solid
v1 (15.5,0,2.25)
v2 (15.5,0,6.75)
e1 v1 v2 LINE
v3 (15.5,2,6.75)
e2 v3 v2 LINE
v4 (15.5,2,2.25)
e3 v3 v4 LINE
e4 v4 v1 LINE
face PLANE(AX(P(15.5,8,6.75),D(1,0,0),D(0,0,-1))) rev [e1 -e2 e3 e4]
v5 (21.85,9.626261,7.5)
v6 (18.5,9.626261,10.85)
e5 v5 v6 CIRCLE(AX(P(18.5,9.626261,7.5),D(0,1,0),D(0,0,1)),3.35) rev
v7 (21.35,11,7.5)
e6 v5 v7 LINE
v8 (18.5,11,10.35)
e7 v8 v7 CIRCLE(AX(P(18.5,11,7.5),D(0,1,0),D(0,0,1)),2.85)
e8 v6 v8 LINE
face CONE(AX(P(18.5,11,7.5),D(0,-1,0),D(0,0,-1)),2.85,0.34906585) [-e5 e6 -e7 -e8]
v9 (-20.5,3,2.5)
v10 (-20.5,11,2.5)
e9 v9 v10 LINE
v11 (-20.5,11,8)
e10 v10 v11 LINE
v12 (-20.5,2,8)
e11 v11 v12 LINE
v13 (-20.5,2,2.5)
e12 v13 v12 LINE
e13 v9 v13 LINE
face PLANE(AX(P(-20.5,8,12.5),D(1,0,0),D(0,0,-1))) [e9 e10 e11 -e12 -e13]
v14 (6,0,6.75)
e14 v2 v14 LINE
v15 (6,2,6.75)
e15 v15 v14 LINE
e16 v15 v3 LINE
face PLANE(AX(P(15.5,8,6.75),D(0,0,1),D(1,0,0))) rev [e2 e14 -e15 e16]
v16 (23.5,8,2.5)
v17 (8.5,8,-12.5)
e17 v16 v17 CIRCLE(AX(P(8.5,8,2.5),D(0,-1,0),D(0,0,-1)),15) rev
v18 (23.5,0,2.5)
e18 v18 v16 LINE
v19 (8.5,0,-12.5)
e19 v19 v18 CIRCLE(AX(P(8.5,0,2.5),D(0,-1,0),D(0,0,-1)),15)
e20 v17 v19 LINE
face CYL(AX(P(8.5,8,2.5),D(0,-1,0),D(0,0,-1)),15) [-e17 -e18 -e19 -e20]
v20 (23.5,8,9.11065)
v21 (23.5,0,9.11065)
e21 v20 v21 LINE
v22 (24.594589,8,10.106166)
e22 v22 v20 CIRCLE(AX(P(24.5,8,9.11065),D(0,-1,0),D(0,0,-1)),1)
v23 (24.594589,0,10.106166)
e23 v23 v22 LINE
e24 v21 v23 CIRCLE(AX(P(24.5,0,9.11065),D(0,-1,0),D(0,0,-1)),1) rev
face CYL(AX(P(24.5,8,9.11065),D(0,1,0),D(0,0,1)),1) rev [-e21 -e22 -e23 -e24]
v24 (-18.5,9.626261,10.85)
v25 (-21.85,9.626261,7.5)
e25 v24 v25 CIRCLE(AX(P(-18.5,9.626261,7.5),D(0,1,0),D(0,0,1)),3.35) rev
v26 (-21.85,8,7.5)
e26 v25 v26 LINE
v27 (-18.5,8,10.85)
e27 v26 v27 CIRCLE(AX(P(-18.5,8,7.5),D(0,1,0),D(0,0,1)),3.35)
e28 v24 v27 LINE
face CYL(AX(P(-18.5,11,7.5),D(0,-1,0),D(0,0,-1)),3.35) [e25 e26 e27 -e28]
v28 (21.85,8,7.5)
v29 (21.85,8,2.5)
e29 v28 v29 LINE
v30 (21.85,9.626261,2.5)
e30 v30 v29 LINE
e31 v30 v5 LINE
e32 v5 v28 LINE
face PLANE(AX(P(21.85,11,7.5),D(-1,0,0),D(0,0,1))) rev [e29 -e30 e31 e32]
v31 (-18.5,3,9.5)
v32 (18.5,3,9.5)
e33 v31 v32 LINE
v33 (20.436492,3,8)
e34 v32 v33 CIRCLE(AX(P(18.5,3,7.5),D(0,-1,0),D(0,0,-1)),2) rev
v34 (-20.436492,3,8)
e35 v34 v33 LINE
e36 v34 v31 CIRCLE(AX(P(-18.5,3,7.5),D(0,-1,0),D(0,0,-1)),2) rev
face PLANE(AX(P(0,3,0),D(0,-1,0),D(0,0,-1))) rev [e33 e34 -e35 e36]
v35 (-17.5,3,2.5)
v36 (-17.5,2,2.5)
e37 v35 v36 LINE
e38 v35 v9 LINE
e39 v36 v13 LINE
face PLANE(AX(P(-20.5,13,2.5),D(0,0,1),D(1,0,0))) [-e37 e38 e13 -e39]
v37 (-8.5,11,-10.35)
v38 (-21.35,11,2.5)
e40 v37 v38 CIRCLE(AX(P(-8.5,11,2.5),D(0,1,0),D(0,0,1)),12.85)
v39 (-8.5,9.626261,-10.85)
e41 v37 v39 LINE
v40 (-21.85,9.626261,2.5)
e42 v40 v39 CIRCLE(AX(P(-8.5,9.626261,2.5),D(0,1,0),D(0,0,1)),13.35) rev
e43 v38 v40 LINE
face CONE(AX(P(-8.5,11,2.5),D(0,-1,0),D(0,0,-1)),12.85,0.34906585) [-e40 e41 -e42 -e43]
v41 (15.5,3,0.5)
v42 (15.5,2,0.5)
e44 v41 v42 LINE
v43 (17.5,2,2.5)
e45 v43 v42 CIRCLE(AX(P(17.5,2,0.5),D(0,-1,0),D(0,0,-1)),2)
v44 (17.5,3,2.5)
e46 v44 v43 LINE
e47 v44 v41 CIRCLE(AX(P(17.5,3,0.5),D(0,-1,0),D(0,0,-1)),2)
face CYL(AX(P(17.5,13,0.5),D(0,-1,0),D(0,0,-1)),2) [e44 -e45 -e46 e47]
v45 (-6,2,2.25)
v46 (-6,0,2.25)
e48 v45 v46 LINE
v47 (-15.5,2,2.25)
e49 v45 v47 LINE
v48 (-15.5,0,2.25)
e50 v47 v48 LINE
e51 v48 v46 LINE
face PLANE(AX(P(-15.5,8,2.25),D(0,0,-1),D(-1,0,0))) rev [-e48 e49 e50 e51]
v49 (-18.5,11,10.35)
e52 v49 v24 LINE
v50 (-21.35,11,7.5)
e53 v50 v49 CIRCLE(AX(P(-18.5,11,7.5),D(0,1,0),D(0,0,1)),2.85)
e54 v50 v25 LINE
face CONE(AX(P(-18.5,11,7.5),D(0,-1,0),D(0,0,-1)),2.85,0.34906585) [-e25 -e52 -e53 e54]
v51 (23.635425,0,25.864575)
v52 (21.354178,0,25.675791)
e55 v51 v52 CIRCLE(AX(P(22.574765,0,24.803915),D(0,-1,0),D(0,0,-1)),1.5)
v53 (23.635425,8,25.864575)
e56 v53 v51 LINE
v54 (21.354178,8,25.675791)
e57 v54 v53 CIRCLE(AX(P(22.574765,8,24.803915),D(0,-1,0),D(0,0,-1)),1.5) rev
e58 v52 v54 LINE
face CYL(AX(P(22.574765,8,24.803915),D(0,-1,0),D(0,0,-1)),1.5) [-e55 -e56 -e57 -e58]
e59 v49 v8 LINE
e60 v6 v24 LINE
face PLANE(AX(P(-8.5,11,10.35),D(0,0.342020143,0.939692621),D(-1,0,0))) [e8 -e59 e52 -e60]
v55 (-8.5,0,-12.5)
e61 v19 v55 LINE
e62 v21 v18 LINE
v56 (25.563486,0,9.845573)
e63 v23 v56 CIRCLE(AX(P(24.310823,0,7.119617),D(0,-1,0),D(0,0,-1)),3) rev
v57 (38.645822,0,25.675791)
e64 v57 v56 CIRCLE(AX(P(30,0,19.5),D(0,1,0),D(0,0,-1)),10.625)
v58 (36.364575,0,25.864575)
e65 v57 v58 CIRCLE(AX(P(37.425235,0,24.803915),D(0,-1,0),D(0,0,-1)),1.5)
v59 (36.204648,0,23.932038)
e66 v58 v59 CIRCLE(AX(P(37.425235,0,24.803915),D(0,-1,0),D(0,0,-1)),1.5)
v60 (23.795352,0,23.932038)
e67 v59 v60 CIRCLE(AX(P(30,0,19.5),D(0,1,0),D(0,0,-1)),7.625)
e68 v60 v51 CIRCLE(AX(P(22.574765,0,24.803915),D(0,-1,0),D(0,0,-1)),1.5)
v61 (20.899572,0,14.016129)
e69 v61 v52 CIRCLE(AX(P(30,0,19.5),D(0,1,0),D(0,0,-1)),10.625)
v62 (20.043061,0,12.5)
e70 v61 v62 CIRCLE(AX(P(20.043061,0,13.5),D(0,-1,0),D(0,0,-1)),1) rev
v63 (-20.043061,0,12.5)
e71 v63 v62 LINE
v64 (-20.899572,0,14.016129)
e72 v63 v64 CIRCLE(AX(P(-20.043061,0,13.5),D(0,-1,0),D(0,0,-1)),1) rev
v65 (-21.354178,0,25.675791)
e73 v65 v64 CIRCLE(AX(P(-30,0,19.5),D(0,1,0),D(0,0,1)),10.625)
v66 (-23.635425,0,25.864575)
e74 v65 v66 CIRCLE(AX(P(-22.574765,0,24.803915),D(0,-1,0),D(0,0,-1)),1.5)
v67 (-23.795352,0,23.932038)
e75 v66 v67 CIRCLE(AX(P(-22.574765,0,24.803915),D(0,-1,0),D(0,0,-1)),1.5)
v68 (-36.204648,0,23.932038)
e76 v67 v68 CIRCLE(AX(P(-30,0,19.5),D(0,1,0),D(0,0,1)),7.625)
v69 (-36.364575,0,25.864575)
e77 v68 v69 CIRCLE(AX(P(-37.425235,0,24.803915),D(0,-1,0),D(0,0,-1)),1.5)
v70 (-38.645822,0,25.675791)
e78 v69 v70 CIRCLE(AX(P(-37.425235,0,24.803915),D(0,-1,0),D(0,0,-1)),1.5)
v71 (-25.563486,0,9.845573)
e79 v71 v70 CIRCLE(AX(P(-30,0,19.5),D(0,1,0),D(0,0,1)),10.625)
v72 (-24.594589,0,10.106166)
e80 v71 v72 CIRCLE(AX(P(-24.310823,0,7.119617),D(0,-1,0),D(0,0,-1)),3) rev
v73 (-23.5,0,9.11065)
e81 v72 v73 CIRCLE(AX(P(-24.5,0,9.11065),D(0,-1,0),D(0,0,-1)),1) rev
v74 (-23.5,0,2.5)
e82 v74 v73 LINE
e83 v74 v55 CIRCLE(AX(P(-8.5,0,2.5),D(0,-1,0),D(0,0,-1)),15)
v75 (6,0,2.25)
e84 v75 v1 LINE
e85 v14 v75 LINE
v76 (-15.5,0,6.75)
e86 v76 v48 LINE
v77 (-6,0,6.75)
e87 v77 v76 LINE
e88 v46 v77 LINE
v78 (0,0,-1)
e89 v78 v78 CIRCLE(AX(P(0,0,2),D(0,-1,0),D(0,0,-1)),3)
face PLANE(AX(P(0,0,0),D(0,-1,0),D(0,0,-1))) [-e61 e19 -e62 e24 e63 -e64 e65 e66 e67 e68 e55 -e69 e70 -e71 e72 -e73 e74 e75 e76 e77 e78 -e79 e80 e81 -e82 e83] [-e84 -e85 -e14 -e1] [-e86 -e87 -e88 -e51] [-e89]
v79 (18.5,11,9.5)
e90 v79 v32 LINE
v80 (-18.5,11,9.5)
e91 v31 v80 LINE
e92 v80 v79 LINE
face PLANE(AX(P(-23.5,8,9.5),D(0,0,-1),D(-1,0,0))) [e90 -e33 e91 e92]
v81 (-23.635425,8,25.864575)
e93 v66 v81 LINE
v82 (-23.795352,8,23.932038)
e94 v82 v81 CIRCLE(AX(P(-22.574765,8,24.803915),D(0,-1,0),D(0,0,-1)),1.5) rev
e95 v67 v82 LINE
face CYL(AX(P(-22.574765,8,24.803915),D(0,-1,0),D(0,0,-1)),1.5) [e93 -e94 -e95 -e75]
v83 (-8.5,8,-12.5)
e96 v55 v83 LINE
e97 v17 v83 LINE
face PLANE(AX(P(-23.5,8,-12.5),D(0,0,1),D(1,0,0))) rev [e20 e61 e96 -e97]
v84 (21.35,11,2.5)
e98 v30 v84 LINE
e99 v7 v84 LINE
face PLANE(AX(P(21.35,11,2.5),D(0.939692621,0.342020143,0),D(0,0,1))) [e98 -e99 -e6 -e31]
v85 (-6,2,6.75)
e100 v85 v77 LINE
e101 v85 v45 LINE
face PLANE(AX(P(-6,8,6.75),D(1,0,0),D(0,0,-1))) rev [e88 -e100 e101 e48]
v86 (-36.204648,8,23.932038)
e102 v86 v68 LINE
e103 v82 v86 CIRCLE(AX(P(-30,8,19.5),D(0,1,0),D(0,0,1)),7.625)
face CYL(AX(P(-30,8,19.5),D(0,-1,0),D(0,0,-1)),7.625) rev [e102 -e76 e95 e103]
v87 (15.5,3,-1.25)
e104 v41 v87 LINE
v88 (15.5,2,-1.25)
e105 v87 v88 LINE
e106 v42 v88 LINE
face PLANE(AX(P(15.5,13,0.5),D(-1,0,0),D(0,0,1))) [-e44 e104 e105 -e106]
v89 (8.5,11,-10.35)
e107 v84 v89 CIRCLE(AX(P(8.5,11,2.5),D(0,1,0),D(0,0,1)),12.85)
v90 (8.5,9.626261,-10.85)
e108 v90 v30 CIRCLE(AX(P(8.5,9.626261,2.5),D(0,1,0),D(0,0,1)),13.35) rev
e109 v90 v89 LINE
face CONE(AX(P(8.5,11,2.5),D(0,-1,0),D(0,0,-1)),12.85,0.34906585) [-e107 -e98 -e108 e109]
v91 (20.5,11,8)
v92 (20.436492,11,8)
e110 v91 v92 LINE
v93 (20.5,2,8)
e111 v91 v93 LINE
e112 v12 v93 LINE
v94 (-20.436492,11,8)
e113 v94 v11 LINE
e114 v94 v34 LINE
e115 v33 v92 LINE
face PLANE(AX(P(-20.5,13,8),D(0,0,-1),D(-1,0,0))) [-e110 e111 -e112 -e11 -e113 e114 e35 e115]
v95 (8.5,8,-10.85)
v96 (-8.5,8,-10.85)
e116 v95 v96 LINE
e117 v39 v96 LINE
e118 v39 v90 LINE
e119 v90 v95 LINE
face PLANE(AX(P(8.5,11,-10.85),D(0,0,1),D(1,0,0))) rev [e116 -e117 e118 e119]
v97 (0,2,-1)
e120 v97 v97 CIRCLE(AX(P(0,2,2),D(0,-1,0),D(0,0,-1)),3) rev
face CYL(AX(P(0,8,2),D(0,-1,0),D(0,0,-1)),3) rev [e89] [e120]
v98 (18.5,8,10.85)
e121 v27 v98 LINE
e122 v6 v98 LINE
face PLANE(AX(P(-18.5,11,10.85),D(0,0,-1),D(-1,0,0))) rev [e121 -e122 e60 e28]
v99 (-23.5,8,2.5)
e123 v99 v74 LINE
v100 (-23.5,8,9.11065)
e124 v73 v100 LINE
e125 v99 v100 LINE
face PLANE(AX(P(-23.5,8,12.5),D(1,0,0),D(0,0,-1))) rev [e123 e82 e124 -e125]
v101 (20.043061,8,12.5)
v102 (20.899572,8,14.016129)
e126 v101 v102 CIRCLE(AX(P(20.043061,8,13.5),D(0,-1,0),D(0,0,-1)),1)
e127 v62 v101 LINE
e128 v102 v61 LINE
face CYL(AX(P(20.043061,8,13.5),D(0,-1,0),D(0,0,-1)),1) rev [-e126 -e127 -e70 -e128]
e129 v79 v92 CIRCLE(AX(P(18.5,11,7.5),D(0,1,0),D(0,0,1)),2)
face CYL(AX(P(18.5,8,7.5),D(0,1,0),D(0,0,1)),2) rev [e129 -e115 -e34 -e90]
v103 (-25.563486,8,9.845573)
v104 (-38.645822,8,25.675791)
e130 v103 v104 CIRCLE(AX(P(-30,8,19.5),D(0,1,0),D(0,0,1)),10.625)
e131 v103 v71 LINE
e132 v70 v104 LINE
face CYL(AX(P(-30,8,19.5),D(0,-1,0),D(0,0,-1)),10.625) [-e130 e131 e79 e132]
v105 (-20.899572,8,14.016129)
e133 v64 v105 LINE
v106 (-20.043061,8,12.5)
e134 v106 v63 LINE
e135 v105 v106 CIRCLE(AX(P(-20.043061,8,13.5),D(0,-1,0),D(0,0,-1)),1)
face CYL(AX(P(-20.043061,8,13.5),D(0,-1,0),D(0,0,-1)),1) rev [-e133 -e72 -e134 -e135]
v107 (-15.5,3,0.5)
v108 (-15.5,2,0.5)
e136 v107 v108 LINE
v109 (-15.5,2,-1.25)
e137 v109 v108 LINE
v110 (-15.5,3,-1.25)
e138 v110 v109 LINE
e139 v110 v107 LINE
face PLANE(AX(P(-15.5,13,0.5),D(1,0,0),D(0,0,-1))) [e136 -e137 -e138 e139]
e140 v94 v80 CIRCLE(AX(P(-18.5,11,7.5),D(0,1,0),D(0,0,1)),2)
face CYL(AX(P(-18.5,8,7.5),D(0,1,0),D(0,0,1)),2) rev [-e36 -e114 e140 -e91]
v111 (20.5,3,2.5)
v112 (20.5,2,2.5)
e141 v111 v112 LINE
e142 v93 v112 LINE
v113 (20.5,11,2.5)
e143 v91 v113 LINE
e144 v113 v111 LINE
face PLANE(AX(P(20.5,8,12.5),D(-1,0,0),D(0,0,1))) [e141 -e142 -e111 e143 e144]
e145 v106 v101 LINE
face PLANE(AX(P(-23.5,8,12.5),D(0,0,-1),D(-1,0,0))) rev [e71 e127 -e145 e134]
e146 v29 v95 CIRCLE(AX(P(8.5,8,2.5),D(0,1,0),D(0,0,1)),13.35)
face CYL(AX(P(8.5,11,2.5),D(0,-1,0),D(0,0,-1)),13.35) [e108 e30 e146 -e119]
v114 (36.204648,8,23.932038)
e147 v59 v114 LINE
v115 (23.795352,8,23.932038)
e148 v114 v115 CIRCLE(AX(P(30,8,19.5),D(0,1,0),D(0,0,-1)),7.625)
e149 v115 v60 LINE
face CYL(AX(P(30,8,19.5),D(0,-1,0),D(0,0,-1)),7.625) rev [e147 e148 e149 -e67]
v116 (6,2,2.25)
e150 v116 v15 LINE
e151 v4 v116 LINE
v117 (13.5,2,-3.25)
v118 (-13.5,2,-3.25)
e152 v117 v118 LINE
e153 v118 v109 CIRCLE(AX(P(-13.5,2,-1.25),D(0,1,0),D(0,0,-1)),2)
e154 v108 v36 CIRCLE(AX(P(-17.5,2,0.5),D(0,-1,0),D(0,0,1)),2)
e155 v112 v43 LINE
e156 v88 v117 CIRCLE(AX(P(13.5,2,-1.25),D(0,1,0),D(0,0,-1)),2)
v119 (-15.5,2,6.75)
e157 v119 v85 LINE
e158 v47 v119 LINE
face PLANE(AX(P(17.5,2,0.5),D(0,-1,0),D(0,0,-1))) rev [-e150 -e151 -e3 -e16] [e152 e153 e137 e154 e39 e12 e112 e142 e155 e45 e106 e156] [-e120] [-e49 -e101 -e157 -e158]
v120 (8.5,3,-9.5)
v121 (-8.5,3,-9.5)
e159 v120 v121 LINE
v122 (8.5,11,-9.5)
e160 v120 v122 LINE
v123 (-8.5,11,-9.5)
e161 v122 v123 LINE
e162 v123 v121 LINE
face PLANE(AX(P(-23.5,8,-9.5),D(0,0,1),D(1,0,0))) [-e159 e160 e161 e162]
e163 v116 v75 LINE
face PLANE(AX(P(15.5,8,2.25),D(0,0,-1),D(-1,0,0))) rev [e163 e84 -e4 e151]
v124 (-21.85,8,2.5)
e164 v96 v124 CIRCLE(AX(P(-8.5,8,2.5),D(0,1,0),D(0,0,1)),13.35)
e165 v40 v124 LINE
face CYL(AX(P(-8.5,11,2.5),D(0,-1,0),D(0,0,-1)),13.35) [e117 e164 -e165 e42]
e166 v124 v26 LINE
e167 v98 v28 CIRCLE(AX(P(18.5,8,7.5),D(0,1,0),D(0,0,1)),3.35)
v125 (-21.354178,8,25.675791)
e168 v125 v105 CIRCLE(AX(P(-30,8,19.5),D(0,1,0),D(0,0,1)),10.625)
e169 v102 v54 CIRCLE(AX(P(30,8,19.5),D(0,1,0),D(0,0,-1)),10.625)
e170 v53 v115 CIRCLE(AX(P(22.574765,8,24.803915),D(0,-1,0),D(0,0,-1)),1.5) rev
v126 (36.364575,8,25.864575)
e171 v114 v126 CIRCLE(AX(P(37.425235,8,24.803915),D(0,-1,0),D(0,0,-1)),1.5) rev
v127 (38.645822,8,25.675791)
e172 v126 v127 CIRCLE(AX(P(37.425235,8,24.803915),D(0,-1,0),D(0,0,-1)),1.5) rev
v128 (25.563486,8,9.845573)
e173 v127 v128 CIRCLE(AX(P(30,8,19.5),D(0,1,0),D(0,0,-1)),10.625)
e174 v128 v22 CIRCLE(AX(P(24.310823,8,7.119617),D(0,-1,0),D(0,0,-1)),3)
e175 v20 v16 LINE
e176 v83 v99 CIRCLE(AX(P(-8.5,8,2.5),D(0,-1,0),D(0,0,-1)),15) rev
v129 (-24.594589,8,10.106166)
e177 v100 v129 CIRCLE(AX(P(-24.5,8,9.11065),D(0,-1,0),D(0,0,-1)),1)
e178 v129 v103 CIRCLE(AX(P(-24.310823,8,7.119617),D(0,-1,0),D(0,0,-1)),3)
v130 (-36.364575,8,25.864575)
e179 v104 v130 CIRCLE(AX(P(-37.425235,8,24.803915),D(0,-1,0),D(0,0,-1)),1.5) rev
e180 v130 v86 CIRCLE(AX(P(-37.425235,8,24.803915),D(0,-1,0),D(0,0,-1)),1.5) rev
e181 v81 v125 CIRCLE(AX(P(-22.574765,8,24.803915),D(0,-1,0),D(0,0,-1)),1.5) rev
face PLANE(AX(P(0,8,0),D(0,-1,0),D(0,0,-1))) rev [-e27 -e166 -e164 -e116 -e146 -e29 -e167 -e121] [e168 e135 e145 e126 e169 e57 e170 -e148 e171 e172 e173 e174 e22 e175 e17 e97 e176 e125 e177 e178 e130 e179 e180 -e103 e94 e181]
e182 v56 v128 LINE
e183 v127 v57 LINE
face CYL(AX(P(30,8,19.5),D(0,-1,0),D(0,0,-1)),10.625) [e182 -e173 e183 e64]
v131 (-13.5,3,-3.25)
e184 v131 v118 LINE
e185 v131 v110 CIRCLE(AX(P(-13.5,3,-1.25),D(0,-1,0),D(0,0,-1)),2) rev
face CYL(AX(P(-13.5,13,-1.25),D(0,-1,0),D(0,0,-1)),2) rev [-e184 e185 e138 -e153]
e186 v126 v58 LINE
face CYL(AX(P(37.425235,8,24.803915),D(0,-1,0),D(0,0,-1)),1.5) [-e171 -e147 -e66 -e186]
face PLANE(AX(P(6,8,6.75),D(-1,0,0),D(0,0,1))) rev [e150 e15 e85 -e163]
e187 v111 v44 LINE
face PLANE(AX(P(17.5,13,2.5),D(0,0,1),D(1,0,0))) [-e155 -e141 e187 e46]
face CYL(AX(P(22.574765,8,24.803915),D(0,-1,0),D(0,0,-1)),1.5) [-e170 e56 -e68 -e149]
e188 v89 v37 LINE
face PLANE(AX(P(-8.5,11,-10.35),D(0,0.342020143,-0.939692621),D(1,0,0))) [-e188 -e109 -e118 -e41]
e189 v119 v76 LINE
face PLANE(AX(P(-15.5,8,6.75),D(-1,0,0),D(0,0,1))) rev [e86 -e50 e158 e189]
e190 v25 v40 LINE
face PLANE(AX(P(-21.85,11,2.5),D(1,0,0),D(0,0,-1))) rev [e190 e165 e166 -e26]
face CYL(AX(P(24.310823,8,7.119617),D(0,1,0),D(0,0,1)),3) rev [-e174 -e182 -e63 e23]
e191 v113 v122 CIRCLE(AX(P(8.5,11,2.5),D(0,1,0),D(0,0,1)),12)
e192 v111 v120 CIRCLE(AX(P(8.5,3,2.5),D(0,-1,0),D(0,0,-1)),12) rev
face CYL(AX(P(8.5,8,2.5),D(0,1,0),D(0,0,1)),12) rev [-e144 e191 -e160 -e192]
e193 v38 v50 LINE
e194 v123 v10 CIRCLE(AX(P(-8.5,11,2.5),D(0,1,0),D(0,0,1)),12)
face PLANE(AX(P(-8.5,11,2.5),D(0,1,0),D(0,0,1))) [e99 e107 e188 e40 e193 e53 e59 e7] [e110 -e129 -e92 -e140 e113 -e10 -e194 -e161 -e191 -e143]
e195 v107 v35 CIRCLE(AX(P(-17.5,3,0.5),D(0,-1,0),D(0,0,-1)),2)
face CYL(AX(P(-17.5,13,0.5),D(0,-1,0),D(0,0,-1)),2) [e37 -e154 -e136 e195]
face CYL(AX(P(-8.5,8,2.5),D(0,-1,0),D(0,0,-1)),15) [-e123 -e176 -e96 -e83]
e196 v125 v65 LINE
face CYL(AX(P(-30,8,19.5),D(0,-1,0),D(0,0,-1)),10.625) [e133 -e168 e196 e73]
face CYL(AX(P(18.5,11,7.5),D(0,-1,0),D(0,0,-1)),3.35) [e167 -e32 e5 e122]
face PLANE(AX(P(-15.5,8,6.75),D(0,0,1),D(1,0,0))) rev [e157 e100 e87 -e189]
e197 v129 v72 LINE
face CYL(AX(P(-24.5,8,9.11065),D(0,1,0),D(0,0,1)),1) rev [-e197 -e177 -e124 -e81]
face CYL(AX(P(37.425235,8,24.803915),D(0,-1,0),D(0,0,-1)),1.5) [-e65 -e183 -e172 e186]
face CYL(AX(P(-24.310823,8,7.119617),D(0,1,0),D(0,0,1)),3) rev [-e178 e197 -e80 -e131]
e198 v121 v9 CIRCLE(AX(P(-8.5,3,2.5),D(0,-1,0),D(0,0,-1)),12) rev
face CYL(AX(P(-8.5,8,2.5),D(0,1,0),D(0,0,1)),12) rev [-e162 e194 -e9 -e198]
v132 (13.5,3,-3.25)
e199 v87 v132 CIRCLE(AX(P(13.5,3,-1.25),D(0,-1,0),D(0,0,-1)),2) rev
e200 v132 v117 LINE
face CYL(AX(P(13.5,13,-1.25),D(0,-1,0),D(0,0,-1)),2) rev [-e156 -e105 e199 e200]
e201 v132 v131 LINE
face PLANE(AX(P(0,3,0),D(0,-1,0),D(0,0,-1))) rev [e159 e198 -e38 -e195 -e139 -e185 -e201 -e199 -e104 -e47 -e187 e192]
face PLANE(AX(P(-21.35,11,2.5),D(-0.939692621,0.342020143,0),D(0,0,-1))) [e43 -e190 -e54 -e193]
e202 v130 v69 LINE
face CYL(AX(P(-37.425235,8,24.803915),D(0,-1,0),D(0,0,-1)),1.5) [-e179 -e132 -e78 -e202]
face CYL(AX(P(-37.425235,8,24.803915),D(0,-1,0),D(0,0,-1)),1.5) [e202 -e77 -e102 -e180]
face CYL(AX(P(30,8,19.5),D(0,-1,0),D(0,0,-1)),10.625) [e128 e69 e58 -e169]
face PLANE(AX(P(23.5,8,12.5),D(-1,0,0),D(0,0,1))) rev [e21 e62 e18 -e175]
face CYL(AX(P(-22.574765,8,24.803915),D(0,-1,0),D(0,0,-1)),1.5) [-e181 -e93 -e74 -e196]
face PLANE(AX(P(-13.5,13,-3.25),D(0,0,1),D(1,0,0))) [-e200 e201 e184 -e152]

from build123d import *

# Parameters (mm, degrees)
SKETCH1_W               = 47
SKETCH1_H               = 25
BOSS_EXTRUDE1_DEPTH     = 8
SHELL1_T                = -3
SKETCH4_R               = 3
SKETCH4_W               = 9.5
SKETCH4_H               = 4.5
CUT_EXTRUDE4_DEPTH      = 28.793884219
FILLET2_R               = 12
FILLET3_R               = 15
SKETCH5_R               = 7.625
BOSS_EXTRUDE3_DEPTH     = 8
FILLET7_R               = 2
FILLET9_R               = 3
FILLET10_R              = 3
BOSS_EXTRUDE4_DEPTH     = 3
FILLET11_R              = 1
CHAMFER1_SIZE           = 0.5
CHAMFER1_SIZE2          = 1.37373871
CUT_EXTRUDE5_DEPTH      = 10
CUT_EXTRUDE5_DEPTH_BACK = 1
CUT_EXTRUDE6_DEPTH      = 10
FILLET12_R              = 1.5


# Some blends are built 0.0001 mm under size
with BuildPart() as part:
    # Sketch1 → Boss-Extrude1 (new body)
    with BuildSketch(Plane(origin=(0, 0, 0), x_dir=(1, 0, 0), z_dir=(0, 1, 0))):
        Rectangle(SKETCH1_W, SKETCH1_H)
    extrude(amount=BOSS_EXTRUDE1_DEPTH)

    # Shell1
    shell1_openings = [part.faces().sort_by_distance(p)[0] for p in [
        (0, 8, 0),
    ]]
    offset(amount=SHELL1_T, openings=shell1_openings, kind=Kind.INTERSECTION)

    # Sketch4 → Cut-Extrude4 (cut, through all)
    with BuildSketch(Plane.XZ):
        with Locations(Location((0, 2, 0), (0, 0, 270))):
            Circle(SKETCH4_R)
        with Locations((10.75, 4.5)):
            Rectangle(SKETCH4_W, SKETCH4_H)
        with Locations((-10.75, 4.5)):
            Rectangle(SKETCH4_W, SKETCH4_H)
    extrude(amount=-CUT_EXTRUDE4_DEPTH, mode=Mode.SUBTRACT)

    # Fillet2
    fillet2_edges = [part.edges().sort_by_distance(p)[0] for p in [
        (-20.5, 5.5, -9.5),
        (20.5, 5.5, -9.5),
    ]]
    fillet(fillet2_edges, radius=FILLET2_R)

    # Fillet3
    fillet3_edges = [part.edges().sort_by_distance(p)[0] for p in [
        (-23.5, 4, -12.5),
        (23.5, 4, -12.5),
    ]]
    fillet(fillet3_edges, radius=FILLET3_R)

    # Sketch5 → Boss-Extrude3 (add)
    # profile 1 of 2: a face of its own
    with BuildSketch(Plane(origin=(0, 0, 0), x_dir=(1, 0, 0), z_dir=(0, 1, 0))):
        with BuildLine():
            Line((-24.109061312, -10.65763231), (-23.023781022, -9.5))
            Line((-23.023781022, -9.5), (-18.817115042, -9.5))
            Line((-18.817115042, -9.5), (-21.851077989, -12.681958121))
            ThreePointArc((-21.851077989, -12.681958121), (-37.092523941, -27.411177481), (-24.109061312, -10.65763231))
        make_face()
        with Locations(Location((-30, -19.5, 0), (0, 0, 270))):
            Circle(SKETCH5_R, mode=Mode.SUBTRACT)
    # profile 2 of 2: a face of its own
    with BuildSketch(Plane(origin=(0, 0, 0), x_dir=(1, 0, 0), z_dir=(0, 1, 0))):
        with BuildLine():
            Line((21.851077989, -12.681958121), (18.817115042, -9.5))
            Line((18.817115042, -9.5), (23.023781022, -9.5))
            Line((23.023781022, -9.5), (24.109061312, -10.65763231))
            ThreePointArc((24.109061312, -10.65763231), (37.092523941, -27.411177481), (21.851077989, -12.681958121))
        make_face()
        with Locations(Location((30, -19.5, 0), (0, 0, 90))):
            Circle(SKETCH5_R, mode=Mode.SUBTRACT)
    extrude(amount=BOSS_EXTRUDE3_DEPTH)

    # Fillet7
    fillet7_edges = [part.edges().sort_by_distance(p)[0] for p in [
        (-20.5, 5.5, 9.5),
        (20.5, 5.5, 9.5),
    ]]
    fillet(fillet7_edges, radius=FILLET7_R)

    # Fillet9
    # the kernel refuses this fillet: 3 mm, written as the material it adds along each edge
    with BuildSketch(Plane(origin=(-24.109061312, 0, 10.65763231), x_dir=(-0.8731241588548913, 0, -0.48749790073798127), z_dir=(0, 1, 0))) as fillet9_piece_1:
        with BuildLine():
            CenterArc((1.900937986, -2.990768498), FILLET9_R, 94.495982628, 40.36086399)
            Line((-0.215075627, -0.864154666), (-0.2573959, -0.82162239))
            ThreePointArc((-0.2573959, -0.82162239), (-0.165761599, -0.417586273), (-0.058223785, 0.01449106))
            Line((-0.058223785, 0.01449106), (0.004703352, 0.05981537))
            ThreePointArc((0.004703352, 0.05981537), (0.8328852, 0.027305096), (1.661067049, 0.05981537))
            Line((1.661067049, 0.05981537), (1.6657704, 0))
        make_face()
    extrude(amount=8)
    with BuildSketch(Plane(origin=(24.109061312, 0, 10.65763231), x_dir=(-0.6839411288813303, 0, -0.7295372041400846), z_dir=(0, 1, 0))) as fillet9_piece_2:
        with BuildLine():
            CenterArc((2.443120942, -2.566986852), FILLET9_R, 121.167021746, 40.36086399)
            Line((-0.402312981, -1.616457637), (-0.45922166, -1.597447053))
            ThreePointArc((-0.45922166, -1.597447053), (-0.227653258, -0.801634155), (-0.059180564, 0.009882353))
            Line((-0.059180564, 0.009882353), (0, 0.06))
            ThreePointArc((0, 0.06), (0.44525858, 0.06), (0.859465085, 0.051339737))
            Line((0.859465085, 0.051339737), (0.89051716, 0))
        make_face()
    extrude(amount=8)

    # Fillet10
    # the kernel refuses this fillet: 3 mm, written as the material it adds along each edge
    with BuildSketch(Plane(origin=(-21.851077989, 0, 12.681958121), x_dir=(0.6041926909004034, 0, 0.796838247238754), z_dir=(0, 1, 0))) as fillet10_piece_1:
        with BuildLine():
            CenterArc((1.162533412, 2.99655072), FILLET10_R, 246.365543593, 20.886670937)
            Line((-0.040166708, 0.248185312), (-0.064220711, 0.193218004))
            ThreePointArc((-0.064220711, 0.193218004), (-0.07931268, 0.114506887), (-0.059229326, -0.009585769))
            Line((-0.059229326, -0.009585769), (0.002876371, -0.059931014))
            ThreePointArc((0.002876371, -0.059931014), (0.509357423, -0.047783801), (1.015838475, -0.059931014))
            Line((1.015838475, -0.059931014), (1.018714846, 0))
        make_face()
    extrude(amount=8)
    with BuildSketch(Plane(origin=(21.851077989, 0, 12.681958121), x_dir=(-0.6041926909004038, 0, 0.7968382472387535), z_dir=(0, 1, 0))) as fillet10_piece_2:
        with BuildLine():
            CenterArc((1.162533412, -2.99655072), FILLET10_R, 92.74778547, 20.886670937)
            Line((-0.040166708, -0.248185312), (-0.064220711, -0.193218004))
            ThreePointArc((-0.064220711, -0.193218004), (-0.07931268, -0.114506887), (-0.059229326, 0.009585769))
            Line((-0.059229326, 0.009585769), (0.002876371, 0.059931014))
            ThreePointArc((0.002876371, 0.059931014), (0.509357423, 0.047783801), (1.015838475, 0.059931014))
            Line((1.015838475, 0.059931014), (1.018714846, 0))
        make_face()
    extrude(amount=8)

    # Sketch6 → Boss-Extrude4 (add)
    with BuildSketch(Plane(origin=(0, 8, 0), x_dir=(1, 0, 0), z_dir=(0, 1, 0))):
        with BuildLine():
            Line((-21.85, -2.5), (-21.85, -7.5))
            ThreePointArc((-21.85, -7.5), (-20.868807717, -9.868807717), (-18.5, -10.85))
            Line((-18.5, -10.85), (18.5, -10.85))
            ThreePointArc((18.5, -10.85), (20.868807717, -9.868807717), (21.85, -7.5))
            Line((21.85, -7.5), (21.85, -2.5))
            ThreePointArc((21.85, -2.5), (17.939875529, 6.939875529), (8.5, 10.85))
            Line((8.5, 10.85), (-8.5, 10.85))
            ThreePointArc((-8.5, 10.85), (-17.939875529, 6.939875529), (-21.85, -2.5))
        make_face()
        with BuildLine():
            Line((-18.5, -9.5), (18.5, -9.5))
            ThreePointArc((18.5, -9.5), (19.914213562, -8.914213562), (20.5, -7.5))
            Line((20.5, -7.5), (20.5, -2.5))
            ThreePointArc((20.5, -2.5), (16.985281374, 5.985281374), (8.5, 9.5))
            Line((8.5, 9.5), (-8.5, 9.5))
            ThreePointArc((-8.5, 9.5), (-16.985281374, 5.985281374), (-20.5, -2.5))
            Line((-20.5, -2.5), (-20.5, -7.5))
            ThreePointArc((-20.5, -7.5), (-19.914213562, -8.914213562), (-18.5, -9.5))
        make_face(mode=Mode.SUBTRACT)
    extrude(amount=BOSS_EXTRUDE4_DEPTH)

    # Fillet11
    fillet11_edges = [part.edges().sort_by_distance(p)[0] for p in [
        (21.677582872, 4, 12.5),
        (23.5, 4, 10.00796691),
        (-21.677582872, 4, 12.5),
        (-23.5, 4, 10.00796691),
    ]]
    fillet(fillet11_edges, radius=FILLET11_R)

    # Chamfer1
    chamfer1_edges = [part.edges().sort_by_distance(p)[0] for p in [
        (-17.939875529, 11, -6.939875529),
        (-21.85, 11, 5),
        (-20.868807717, 11, 9.868807717),
        (0, 11, 10.85),
        (20.868807717, 11, 9.868807717),
        (21.85, 11, 5),
        (17.939875529, 11, -6.939875529),
        (0, 11, -10.85),
    ]]
    chamfer1_side = [part.faces().sort_by_distance(p)[0] for p in [
        (-21.362088123, 11, 5),
    ]]
    chamfer(chamfer1_edges, length=CHAMFER1_SIZE, length2=CHAMFER1_SIZE2, reference=chamfer1_side[0])

    # Sketch7 → Cut-Extrude5 (cut, two sides: drawn at the far end of the back side and taken through both)
    with BuildSketch(Plane(origin=(0, 3, 0), x_dir=(1, 0, 0), z_dir=(0, 1, 0)).offset(-CUT_EXTRUDE5_DEPTH_BACK)):
        with BuildLine():
            Line((-20.5, -6.75), (-20.5, -2.5))
            Line((-20.5, -2.5), (-17.5, -2.5))
            ThreePointArc((-17.5, -2.5), (-16.085786438, -1.914213562), (-15.5, -0.5))
            Line((-15.5, -0.5), (-15.5, 1.25))
            ThreePointArc((-15.5, 1.25), (-14.914213562, 2.664213562), (-13.5, 3.25))
            Line((-13.5, 3.25), (13.5, 3.25))
            ThreePointArc((13.5, 3.25), (14.914213562, 2.664213562), (15.5, 1.25))
            Line((15.5, 1.25), (15.5, -0.5))
            ThreePointArc((15.5, -0.5), (16.085786438, -1.914213562), (17.5, -2.5))
            Line((17.5, -2.5), (20.5, -2.5))
            Line((20.5, -2.5), (20.5, -6.75))
            Line((20.5, -6.75), (20.5, -8))
            Line((20.5, -8), (-20.5, -8))
            Line((-20.5, -8), (-20.5, -6.75))
        make_face()
    extrude(amount=CUT_EXTRUDE5_DEPTH + CUT_EXTRUDE5_DEPTH_BACK, mode=Mode.SUBTRACT)

    # Sketch8 → Cut-Extrude6 (cut)
    with BuildSketch(Plane.XZ):
        Polygon((-30, 19.5), (-42.679355302, 32.179355302), (-17.320644698, 32.179355302), align=None)
        Polygon((42.679355302, 32.179355302), (17.320644698, 32.179355302), (30, 19.5), align=None)
    extrude(amount=-CUT_EXTRUDE6_DEPTH, mode=Mode.SUBTRACT)

    # Fillet12
    fillet12_edges = [part.edges().sort_by_distance(p)[0] for p in [
        (37.51300955, 4, 27.01300955),
        (35.391689207, 4, 24.891689207),
        (24.608310793, 4, 24.891689207),
        (22.48699045, 4, 27.01300955),
        (-24.608310793, 4, 24.891689207),
        (-22.48699045, 4, 27.01300955),
        (-35.391689207, 4, 24.891689207),
        (-37.51300955, 4, 27.01300955),
    ]]
    fillet(fillet12_edges, radius=FILLET12_R - 0.0001)  # a hair under: the kernel refuses the full size


solid = part.part
